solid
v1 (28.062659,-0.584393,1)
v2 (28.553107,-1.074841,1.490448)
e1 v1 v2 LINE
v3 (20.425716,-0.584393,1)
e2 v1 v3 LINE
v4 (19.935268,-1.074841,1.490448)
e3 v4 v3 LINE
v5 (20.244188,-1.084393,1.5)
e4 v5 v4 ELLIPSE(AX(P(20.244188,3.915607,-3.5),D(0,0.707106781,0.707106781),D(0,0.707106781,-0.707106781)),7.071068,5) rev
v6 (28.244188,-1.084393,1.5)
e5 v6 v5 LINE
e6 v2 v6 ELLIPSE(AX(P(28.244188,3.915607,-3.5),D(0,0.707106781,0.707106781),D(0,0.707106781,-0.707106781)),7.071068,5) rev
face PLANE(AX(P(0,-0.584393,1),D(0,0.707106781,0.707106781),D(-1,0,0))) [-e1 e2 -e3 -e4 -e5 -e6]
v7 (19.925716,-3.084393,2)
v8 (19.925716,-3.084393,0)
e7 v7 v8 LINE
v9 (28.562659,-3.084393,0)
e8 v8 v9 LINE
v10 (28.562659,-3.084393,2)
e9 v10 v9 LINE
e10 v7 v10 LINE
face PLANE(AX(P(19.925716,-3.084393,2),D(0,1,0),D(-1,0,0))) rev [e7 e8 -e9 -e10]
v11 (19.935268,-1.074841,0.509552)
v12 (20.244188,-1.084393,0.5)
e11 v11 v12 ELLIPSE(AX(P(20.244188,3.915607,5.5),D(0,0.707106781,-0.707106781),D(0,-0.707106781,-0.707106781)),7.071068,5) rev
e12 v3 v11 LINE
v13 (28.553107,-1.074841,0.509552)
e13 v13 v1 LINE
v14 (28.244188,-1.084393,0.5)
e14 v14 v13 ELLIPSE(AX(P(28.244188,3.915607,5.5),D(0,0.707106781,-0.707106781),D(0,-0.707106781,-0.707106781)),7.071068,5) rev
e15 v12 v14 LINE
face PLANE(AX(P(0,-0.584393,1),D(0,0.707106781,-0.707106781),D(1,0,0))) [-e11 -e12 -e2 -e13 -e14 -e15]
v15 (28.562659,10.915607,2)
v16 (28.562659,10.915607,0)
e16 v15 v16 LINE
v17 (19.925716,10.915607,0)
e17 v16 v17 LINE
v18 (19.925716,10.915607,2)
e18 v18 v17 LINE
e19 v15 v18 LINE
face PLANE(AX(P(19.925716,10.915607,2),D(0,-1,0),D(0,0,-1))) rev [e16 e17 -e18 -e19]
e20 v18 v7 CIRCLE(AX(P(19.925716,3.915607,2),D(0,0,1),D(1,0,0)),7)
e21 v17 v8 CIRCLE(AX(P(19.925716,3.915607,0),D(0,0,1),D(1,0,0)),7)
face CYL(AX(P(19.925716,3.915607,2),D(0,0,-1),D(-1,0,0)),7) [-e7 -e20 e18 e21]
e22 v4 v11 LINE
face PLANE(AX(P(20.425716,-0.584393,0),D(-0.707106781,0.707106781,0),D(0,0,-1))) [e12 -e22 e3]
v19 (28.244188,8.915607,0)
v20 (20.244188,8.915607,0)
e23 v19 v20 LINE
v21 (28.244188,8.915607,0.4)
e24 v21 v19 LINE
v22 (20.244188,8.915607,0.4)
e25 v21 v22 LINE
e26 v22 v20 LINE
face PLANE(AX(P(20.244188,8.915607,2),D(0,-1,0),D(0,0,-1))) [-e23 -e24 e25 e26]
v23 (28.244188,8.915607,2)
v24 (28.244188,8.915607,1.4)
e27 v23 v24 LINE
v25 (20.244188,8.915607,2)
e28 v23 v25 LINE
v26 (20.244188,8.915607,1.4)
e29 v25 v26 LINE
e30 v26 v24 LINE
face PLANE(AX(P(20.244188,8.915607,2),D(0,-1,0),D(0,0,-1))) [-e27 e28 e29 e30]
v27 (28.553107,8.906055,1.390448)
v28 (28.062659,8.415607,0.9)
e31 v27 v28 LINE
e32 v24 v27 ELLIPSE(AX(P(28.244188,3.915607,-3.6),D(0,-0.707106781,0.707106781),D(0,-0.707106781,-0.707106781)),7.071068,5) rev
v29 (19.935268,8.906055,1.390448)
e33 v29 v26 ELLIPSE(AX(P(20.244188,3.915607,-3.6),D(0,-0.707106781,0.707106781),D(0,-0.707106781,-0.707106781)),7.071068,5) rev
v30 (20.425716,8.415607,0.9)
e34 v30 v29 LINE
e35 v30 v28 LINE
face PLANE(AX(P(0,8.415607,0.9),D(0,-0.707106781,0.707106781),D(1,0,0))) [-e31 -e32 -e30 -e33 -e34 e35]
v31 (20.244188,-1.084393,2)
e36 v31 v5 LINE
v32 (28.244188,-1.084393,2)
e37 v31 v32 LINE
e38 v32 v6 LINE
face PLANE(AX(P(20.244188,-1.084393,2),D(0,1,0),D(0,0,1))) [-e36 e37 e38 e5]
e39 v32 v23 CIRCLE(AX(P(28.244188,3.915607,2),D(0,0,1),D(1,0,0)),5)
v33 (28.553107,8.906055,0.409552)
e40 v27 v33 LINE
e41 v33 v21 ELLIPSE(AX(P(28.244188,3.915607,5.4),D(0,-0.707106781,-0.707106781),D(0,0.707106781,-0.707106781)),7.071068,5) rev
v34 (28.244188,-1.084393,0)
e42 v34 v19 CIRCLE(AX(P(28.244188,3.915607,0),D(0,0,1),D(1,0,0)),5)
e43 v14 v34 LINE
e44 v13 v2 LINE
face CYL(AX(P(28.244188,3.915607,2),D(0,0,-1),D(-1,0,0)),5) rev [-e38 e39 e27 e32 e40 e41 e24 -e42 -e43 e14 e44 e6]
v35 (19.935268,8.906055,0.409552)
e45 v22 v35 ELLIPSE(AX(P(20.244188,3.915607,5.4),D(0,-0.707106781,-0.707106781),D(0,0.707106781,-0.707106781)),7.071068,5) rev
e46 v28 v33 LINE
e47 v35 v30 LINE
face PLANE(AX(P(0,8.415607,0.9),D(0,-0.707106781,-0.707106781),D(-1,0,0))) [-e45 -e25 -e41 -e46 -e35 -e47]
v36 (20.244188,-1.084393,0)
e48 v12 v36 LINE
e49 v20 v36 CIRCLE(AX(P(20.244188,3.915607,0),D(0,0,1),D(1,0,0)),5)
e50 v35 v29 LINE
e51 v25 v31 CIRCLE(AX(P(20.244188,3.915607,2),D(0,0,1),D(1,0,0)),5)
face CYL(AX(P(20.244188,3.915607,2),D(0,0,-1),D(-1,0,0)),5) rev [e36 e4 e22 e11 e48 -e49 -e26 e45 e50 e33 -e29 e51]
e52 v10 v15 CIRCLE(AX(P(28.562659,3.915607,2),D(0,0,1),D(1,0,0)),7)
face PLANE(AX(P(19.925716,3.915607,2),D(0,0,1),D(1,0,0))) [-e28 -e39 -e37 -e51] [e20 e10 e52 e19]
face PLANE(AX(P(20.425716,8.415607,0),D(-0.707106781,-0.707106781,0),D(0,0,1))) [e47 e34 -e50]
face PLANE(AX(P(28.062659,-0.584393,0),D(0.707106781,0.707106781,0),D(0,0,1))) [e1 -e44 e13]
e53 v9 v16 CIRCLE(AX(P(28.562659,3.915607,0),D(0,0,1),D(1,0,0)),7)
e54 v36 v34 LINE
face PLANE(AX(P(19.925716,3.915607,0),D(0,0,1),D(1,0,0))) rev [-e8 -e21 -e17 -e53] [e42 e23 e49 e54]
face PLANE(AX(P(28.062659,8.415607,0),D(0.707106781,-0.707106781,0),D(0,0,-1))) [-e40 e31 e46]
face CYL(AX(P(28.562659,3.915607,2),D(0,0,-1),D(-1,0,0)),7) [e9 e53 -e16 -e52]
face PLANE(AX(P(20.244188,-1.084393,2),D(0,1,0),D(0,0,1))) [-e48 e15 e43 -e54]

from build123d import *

# Parameters (mm, degrees)
BASEBOSS_EXTRUDE1_DEPTH = 2
SKETCH3_W               = 8.636942675
SKETCH3_H               = 1
BOSS_EXTRUDE1_DEPTH     = 0.5
SKETCH4_W               = 8.636942675
SKETCH4_H               = 1
BOSS_EXTRUDE2_DEPTH     = 0.5
CHAMFER1_SIZE           = 0.5
CHAMFER2_SIZE           = 0.5


# Some blends are built 0.0001 mm under size
with BuildPart() as part:
    # Sketch1 → BaseBoss-Extrude1 (new body)
    with BuildSketch(Plane.XY):
        with BuildLine():
            Line((19.925716198, 10.915607247), (28.562658873, 10.915607247))
            ThreePointArc((28.562658873, 10.915607247), (35.562658873, 3.915607247), (28.562658873, -3.084392753))
            Line((28.562658873, -3.084392753), (19.925716198, -3.084392753))
            ThreePointArc((19.925716198, -3.084392753), (12.925716198, 3.915607247), (19.925716198, 10.915607247))
        make_face()
        with BuildLine():
            Line((20.244187536, 8.915607247), (28.244187536, 8.915607247))
            ThreePointArc((28.244187536, 8.915607247), (33.244187536, 3.915607247), (28.244187536, -1.084392753))
            Line((28.244187536, -1.084392753), (20.244187536, -1.084392753))
            ThreePointArc((20.244187536, -1.084392753), (15.244187536, 3.915607247), (20.244187536, 8.915607247))
        make_face(mode=Mode.SUBTRACT)
    extrude(amount=BASEBOSS_EXTRUDE1_DEPTH)

    # Sketch3 → Boss-Extrude1 (add)
    with BuildSketch(Plane.XZ.offset(-8.915607247)):
        with Locations((24.244187536, 0.9)):
            Rectangle(SKETCH3_W, SKETCH3_H)
    extrude(amount=BOSS_EXTRUDE1_DEPTH)

    # Sketch4 → Boss-Extrude2 (add)
    with BuildSketch(Plane(origin=(0, -1.084392753, 0), x_dir=(1, 0, 0), z_dir=(0, 1, 0))):
        with Locations((24.244187536, -1)):
            Rectangle(SKETCH4_W, SKETCH4_H)
    extrude(amount=BOSS_EXTRUDE2_DEPTH)

    # Chamfer1
    # the kernel refuses this chamfer: 0.5 mm, written as the material it takes off along each edge
    with BuildSketch(Plane(origin=(28.562658873, -0.584392753, -0.785841494), x_dir=(0.02749587661058907, -0.9996219169112965, 0), z_dir=(0, 0, 1))) as chamfer1_piece_1_section:
        Polygon((CHAMFER1_SIZE * 0.999621916911, -CHAMFER1_SIZE * 0.0274958766106), (-CHAMFER1_SIZE * 0.0274958766106, -CHAMFER1_SIZE * 0.999621916911), (0, 0), align=None)
    chamfer1_piece_1 = extrude(amount=3.571682988, mode=Mode.PRIVATE)
    chamfer1_piece_1 = chamfer1_piece_1 & Plane(origin=(28.244187536, 3.915607247, 1), x_dir=(0, 1, 0), z_dir=(0, 0, -1)) * Cylinder(5, 10, mode=Mode.PRIVATE)
    add(chamfer1_piece_1, mode=Mode.SUBTRACT)
    with BuildSketch(Plane(origin=(19.925716198, -0.584392753, 2.785841494), x_dir=(-0.02749587661058907, -0.9996219169112965, 0), z_dir=(0, 0, -1))) as chamfer1_piece_2_section:
        Polygon((CHAMFER1_SIZE * 0.999621916911, -CHAMFER1_SIZE * 0.0274958766106), (-CHAMFER1_SIZE * 0.0274958766106, -CHAMFER1_SIZE * 0.999621916911), (0, 0), align=None)
    chamfer1_piece_2 = extrude(amount=3.571682988, mode=Mode.PRIVATE)
    chamfer1_piece_2 = chamfer1_piece_2 & Plane(origin=(20.244187536, 3.915607247, 1), x_dir=(0, -1, 0), z_dir=(0, 0, -1)) * Cylinder(5, 10, mode=Mode.PRIVATE)
    add(chamfer1_piece_2, mode=Mode.SUBTRACT)
    with BuildSketch(Plane(origin=(28.562658873, 8.415607247, 2.685841494), x_dir=(0.0274958766105891, 0.9996219169112968, 0), z_dir=(0, 0, -1))) as chamfer1_piece_3_section:
        Polygon((CHAMFER1_SIZE * 0.999621916911, -CHAMFER1_SIZE * 0.0274958766106), (-CHAMFER1_SIZE * 0.0274958766106, -CHAMFER1_SIZE * 0.999621916911), (0, 0), align=None)
    chamfer1_piece_3 = extrude(amount=3.571682988, mode=Mode.PRIVATE)
    chamfer1_piece_3 = chamfer1_piece_3 & Plane(origin=(28.244187536, 3.915607247, 0.9), x_dir=(0, 1, 0), z_dir=(0, 0, -1)) * Cylinder(5, 10, mode=Mode.PRIVATE)
    add(chamfer1_piece_3, mode=Mode.SUBTRACT)
    with BuildSketch(Plane(origin=(19.925716198, 8.415607247, -0.885841494), x_dir=(-0.0274958766105891, 0.9996219169112968, 0), z_dir=(0, 0, 1))) as chamfer1_piece_4_section:
        Polygon((CHAMFER1_SIZE * 0.999621916911, -CHAMFER1_SIZE * 0.0274958766106), (-CHAMFER1_SIZE * 0.0274958766106, -CHAMFER1_SIZE * 0.999621916911), (0, 0), align=None)
    chamfer1_piece_4 = extrude(amount=3.571682988, mode=Mode.PRIVATE)
    chamfer1_piece_4 = chamfer1_piece_4 & Plane(origin=(20.244187536, 3.915607247, 0.9), x_dir=(0, -1, 0), z_dir=(0, 0, -1)) * Cylinder(5, 10, mode=Mode.PRIVATE)
    add(chamfer1_piece_4, mode=Mode.SUBTRACT)

    # Chamfer2
    chamfer2_edges = [part.edges().sort_by_distance(p)[0] for p in [
        (24.244187536, -0.584392753, 0.5),
        (24.244187536, 8.415607247, 0.4),
        (24.244187536, 8.415607247, 1.4),
        (24.244187536, -0.584392753, 1.5),
    ]]
    chamfer(chamfer2_edges, length=CHAMFER2_SIZE - 0.0001)  # a hair under: the kernel refuses the full size


solid = part.part
